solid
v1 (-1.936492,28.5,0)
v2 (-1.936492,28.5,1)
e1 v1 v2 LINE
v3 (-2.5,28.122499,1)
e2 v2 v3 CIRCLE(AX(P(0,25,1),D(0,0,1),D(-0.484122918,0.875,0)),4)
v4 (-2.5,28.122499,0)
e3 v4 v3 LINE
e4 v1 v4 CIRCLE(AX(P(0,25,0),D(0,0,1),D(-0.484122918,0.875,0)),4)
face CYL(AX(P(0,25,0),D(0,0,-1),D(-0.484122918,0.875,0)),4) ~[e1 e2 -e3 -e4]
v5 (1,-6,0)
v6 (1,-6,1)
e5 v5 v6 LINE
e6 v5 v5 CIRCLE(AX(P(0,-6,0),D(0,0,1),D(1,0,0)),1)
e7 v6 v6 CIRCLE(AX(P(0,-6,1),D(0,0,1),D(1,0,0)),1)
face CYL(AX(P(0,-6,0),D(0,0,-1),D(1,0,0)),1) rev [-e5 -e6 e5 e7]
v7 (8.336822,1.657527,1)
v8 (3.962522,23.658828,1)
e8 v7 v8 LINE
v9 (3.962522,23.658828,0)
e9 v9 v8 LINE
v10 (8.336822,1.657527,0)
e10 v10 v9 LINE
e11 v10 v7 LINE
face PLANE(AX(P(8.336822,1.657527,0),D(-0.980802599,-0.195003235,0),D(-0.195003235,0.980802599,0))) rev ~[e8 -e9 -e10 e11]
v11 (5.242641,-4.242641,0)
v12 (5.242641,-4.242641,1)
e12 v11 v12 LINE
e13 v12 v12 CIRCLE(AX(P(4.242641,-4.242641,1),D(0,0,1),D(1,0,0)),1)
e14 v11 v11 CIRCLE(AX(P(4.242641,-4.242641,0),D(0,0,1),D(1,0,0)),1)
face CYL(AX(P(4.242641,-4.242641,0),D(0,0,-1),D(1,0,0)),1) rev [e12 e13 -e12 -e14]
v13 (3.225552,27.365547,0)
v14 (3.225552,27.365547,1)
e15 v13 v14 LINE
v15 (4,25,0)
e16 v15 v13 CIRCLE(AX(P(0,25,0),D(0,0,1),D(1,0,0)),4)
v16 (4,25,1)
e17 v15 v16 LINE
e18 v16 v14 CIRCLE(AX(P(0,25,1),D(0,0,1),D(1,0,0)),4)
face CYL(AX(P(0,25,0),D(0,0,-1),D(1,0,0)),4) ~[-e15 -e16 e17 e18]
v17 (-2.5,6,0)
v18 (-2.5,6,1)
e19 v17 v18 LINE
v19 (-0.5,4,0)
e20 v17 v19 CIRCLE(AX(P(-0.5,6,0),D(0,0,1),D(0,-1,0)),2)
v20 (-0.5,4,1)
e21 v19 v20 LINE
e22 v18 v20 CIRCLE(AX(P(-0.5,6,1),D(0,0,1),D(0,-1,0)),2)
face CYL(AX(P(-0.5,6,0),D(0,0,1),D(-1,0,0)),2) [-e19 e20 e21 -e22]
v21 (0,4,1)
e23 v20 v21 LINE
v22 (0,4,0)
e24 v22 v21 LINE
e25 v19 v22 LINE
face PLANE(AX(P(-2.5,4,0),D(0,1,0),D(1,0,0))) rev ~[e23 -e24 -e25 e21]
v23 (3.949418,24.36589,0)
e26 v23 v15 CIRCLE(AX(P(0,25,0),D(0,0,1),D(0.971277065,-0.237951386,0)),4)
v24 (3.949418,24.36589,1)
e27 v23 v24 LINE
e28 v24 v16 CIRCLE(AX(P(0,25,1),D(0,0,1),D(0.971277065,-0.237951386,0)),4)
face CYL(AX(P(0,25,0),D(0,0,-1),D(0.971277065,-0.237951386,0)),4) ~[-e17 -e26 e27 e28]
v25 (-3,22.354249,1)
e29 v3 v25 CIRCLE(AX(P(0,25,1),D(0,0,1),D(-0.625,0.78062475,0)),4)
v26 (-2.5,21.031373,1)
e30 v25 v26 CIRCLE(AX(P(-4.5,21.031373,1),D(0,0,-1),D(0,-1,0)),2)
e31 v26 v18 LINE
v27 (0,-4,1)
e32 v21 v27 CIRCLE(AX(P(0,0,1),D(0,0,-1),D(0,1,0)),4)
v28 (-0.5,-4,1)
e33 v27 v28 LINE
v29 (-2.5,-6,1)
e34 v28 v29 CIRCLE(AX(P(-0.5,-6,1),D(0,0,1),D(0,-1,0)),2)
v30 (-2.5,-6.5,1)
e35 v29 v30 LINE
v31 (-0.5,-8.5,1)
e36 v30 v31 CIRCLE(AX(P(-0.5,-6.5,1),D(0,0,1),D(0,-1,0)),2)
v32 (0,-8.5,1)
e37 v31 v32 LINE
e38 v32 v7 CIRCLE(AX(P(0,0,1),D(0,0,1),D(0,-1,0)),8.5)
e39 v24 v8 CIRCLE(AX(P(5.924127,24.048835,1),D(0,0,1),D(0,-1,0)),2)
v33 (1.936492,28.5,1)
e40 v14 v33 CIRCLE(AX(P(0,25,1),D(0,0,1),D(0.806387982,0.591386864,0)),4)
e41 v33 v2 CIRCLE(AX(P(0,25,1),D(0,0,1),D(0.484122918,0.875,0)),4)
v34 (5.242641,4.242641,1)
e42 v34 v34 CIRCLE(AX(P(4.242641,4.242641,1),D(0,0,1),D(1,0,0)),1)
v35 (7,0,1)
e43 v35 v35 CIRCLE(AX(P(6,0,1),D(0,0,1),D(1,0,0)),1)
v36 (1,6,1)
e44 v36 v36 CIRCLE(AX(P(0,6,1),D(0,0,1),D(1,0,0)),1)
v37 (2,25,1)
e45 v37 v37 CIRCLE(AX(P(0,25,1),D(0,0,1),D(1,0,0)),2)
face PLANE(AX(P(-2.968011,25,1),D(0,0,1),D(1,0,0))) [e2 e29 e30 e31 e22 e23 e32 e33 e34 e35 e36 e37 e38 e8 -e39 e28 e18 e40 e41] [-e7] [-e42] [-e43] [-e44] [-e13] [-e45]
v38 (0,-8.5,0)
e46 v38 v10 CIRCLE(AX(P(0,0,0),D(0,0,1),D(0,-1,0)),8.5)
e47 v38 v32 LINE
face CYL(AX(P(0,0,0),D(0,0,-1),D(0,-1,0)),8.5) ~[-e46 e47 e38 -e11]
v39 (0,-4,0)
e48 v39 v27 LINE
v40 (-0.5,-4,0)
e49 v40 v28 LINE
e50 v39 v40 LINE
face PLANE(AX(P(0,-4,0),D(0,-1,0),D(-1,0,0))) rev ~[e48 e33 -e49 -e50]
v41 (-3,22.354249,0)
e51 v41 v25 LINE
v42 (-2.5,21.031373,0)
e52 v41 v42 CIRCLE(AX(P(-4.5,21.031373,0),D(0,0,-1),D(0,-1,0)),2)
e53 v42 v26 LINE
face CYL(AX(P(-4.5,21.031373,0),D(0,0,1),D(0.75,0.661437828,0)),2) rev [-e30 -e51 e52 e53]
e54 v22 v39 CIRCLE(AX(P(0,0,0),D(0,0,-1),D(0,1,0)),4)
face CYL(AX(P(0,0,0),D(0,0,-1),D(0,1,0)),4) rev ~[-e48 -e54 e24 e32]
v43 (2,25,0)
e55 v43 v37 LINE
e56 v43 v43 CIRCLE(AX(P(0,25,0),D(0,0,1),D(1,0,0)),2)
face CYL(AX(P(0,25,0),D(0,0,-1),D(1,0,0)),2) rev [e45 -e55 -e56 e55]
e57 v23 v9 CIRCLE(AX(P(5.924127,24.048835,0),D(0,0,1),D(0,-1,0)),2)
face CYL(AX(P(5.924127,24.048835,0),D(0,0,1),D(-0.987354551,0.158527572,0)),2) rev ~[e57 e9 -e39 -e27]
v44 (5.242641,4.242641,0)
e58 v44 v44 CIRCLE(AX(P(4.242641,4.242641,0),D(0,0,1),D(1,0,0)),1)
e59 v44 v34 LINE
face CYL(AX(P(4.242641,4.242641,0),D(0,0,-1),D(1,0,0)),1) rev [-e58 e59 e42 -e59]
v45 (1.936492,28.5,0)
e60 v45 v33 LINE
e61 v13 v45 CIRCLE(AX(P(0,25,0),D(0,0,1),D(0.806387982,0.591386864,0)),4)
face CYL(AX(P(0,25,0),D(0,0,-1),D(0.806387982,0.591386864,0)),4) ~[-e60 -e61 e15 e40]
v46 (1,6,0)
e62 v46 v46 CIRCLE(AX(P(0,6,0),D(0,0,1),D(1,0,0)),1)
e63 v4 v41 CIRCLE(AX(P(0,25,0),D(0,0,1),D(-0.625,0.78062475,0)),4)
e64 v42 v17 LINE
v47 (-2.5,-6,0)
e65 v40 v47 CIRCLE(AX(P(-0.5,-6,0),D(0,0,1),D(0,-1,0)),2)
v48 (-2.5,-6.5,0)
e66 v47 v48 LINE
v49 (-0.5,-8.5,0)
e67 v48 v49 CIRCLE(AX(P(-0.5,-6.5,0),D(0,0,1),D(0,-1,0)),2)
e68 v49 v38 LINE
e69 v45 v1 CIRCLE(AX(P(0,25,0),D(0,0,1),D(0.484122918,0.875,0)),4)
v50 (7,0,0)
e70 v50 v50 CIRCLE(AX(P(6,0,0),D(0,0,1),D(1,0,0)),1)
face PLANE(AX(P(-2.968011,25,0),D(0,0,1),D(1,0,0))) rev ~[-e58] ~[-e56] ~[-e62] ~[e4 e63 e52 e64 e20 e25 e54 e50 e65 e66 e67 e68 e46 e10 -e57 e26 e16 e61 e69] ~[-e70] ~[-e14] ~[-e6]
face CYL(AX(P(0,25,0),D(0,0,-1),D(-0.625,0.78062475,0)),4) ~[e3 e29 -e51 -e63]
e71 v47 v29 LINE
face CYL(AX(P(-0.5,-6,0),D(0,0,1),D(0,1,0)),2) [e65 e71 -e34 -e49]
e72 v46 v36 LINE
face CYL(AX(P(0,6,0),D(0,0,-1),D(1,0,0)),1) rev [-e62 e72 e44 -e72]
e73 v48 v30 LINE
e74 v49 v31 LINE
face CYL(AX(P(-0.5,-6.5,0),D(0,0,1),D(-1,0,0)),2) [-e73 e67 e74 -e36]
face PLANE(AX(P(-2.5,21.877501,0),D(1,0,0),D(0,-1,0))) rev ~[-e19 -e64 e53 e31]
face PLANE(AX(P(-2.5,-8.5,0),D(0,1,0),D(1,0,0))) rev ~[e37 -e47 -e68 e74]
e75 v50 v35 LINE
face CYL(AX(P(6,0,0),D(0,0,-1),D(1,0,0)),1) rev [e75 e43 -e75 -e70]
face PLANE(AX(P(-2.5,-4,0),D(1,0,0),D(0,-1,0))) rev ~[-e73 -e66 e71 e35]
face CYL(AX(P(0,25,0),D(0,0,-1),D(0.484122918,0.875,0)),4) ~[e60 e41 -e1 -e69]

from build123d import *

# Parameters (mm, degrees)
F0_R     = 1
F0_R_2   = 2
F1_DEPTH = 1
F2_R     = 2


with BuildPart() as f1:
    # F0 (on Top) → F1 (new body)
    with BuildSketch(Plane.XY):
        with BuildLine():
            ThreePointArc((-2.5, 28.1224989992), (-4, 25), (-2.5, 21.8775010008))
            Line((-2.5, 21.8775010008), (-2.5, 28.1224989992))
        make_face()
        with BuildLine():
            ThreePointArc((1.9364916731, 28.5), (0, 29), (-1.9364916731, 28.5))
            Line((-1.9364916731, 28.5), (1.9364916731, 28.5))
        make_face()
        with BuildLine():
            Line((3.2255519271, 27.3655474558), (3.8851082618, 24.0481944557))
            ThreePointArc((3.8851082618, 24.0481944557), (3.9711731923, 24.5206426422), (4, 25))
            ThreePointArc((4, 25), (3.8014607527, 26.2445465624), (3.2255519271, 27.3655474558))
        make_face()
        with BuildLine():
            ThreePointArc((0, -8.5), (-1.2640556872, -8.4054841157), (-2.5, -8.1240384046))
            Line((-2.5, -8.1240384046), (-2.5, -8.5))
            Line((-2.5, -8.5), (0, -8.5))
        make_face()
        with BuildLine():
            ThreePointArc((0, 4), (4, 0), (0, -4))
            Line((0, -4), (-2.5, -4))
            Line((-2.5, -4), (-2.5, -8.1240384046))
            ThreePointArc((-2.5, -8.1240384046), (-1.2640556872, -8.4054841157), (0, -8.5))
            ThreePointArc((0, -8.5), (6.5703494482, -5.3926346185), (8.3368220918, 1.6575274991))
            Line((8.3368220918, 1.6575274991), (3.8851082618, 24.0481944557))
            ThreePointArc((3.8851082618, 24.0481944557), (1.2874815505, 21.2128650332), (-2.5, 21.8775010008))
            Line((-2.5, 21.8775010008), (-2.5, 4))
            Line((-2.5, 4), (0, 4))
        make_face()
        with Locations((0, -6)):
            Circle(F0_R, mode=Mode.SUBTRACT)
        with Locations((0, 6)):
            Circle(F0_R, mode=Mode.SUBTRACT)
        with Locations((4.2426406871, -4.2426406871)):
            Circle(F0_R, mode=Mode.SUBTRACT)
        with Locations((6, 0)):
            Circle(F0_R, mode=Mode.SUBTRACT)
        with Locations((4.2426406871, 4.2426406871)):
            Circle(F0_R, mode=Mode.SUBTRACT)
        with BuildLine():
            Line((-2.5, 28.1224989992), (-2.5, 21.8775010008))
            ThreePointArc((-2.5, 21.8775010008), (1.2874815505, 21.2128650332), (3.8851082618, 24.0481944557))
            Line((3.8851082618, 24.0481944557), (3.2255519271, 27.3655474558))
            ThreePointArc((3.2255519271, 27.3655474558), (2.6426159721, 28.002762199), (1.9364916731, 28.5))
            Line((1.9364916731, 28.5), (-1.9364916731, 28.5))
            ThreePointArc((-1.9364916731, 28.5), (-2.2262617418, 28.3232151085), (-2.5, 28.1224989992))
        make_face()
        with Locations((0, 25)):
            Circle(F0_R_2, mode=Mode.SUBTRACT)
    extrude(amount=F1_DEPTH)

    # F2
    f2_edges = [f1.edges().sort_by_distance(p)[0] for p in [
        (-2.5, 4, 0.5),
        (-2.5, -4, 0.5),
        (-2.5, -8.5, 0.5),
        (-2.5, 21.877501, 0.5),
        (3.885108, 24.048194, 0.5),
    ]]
    fillet(f2_edges, radius=F2_R)


solid = f1.part
